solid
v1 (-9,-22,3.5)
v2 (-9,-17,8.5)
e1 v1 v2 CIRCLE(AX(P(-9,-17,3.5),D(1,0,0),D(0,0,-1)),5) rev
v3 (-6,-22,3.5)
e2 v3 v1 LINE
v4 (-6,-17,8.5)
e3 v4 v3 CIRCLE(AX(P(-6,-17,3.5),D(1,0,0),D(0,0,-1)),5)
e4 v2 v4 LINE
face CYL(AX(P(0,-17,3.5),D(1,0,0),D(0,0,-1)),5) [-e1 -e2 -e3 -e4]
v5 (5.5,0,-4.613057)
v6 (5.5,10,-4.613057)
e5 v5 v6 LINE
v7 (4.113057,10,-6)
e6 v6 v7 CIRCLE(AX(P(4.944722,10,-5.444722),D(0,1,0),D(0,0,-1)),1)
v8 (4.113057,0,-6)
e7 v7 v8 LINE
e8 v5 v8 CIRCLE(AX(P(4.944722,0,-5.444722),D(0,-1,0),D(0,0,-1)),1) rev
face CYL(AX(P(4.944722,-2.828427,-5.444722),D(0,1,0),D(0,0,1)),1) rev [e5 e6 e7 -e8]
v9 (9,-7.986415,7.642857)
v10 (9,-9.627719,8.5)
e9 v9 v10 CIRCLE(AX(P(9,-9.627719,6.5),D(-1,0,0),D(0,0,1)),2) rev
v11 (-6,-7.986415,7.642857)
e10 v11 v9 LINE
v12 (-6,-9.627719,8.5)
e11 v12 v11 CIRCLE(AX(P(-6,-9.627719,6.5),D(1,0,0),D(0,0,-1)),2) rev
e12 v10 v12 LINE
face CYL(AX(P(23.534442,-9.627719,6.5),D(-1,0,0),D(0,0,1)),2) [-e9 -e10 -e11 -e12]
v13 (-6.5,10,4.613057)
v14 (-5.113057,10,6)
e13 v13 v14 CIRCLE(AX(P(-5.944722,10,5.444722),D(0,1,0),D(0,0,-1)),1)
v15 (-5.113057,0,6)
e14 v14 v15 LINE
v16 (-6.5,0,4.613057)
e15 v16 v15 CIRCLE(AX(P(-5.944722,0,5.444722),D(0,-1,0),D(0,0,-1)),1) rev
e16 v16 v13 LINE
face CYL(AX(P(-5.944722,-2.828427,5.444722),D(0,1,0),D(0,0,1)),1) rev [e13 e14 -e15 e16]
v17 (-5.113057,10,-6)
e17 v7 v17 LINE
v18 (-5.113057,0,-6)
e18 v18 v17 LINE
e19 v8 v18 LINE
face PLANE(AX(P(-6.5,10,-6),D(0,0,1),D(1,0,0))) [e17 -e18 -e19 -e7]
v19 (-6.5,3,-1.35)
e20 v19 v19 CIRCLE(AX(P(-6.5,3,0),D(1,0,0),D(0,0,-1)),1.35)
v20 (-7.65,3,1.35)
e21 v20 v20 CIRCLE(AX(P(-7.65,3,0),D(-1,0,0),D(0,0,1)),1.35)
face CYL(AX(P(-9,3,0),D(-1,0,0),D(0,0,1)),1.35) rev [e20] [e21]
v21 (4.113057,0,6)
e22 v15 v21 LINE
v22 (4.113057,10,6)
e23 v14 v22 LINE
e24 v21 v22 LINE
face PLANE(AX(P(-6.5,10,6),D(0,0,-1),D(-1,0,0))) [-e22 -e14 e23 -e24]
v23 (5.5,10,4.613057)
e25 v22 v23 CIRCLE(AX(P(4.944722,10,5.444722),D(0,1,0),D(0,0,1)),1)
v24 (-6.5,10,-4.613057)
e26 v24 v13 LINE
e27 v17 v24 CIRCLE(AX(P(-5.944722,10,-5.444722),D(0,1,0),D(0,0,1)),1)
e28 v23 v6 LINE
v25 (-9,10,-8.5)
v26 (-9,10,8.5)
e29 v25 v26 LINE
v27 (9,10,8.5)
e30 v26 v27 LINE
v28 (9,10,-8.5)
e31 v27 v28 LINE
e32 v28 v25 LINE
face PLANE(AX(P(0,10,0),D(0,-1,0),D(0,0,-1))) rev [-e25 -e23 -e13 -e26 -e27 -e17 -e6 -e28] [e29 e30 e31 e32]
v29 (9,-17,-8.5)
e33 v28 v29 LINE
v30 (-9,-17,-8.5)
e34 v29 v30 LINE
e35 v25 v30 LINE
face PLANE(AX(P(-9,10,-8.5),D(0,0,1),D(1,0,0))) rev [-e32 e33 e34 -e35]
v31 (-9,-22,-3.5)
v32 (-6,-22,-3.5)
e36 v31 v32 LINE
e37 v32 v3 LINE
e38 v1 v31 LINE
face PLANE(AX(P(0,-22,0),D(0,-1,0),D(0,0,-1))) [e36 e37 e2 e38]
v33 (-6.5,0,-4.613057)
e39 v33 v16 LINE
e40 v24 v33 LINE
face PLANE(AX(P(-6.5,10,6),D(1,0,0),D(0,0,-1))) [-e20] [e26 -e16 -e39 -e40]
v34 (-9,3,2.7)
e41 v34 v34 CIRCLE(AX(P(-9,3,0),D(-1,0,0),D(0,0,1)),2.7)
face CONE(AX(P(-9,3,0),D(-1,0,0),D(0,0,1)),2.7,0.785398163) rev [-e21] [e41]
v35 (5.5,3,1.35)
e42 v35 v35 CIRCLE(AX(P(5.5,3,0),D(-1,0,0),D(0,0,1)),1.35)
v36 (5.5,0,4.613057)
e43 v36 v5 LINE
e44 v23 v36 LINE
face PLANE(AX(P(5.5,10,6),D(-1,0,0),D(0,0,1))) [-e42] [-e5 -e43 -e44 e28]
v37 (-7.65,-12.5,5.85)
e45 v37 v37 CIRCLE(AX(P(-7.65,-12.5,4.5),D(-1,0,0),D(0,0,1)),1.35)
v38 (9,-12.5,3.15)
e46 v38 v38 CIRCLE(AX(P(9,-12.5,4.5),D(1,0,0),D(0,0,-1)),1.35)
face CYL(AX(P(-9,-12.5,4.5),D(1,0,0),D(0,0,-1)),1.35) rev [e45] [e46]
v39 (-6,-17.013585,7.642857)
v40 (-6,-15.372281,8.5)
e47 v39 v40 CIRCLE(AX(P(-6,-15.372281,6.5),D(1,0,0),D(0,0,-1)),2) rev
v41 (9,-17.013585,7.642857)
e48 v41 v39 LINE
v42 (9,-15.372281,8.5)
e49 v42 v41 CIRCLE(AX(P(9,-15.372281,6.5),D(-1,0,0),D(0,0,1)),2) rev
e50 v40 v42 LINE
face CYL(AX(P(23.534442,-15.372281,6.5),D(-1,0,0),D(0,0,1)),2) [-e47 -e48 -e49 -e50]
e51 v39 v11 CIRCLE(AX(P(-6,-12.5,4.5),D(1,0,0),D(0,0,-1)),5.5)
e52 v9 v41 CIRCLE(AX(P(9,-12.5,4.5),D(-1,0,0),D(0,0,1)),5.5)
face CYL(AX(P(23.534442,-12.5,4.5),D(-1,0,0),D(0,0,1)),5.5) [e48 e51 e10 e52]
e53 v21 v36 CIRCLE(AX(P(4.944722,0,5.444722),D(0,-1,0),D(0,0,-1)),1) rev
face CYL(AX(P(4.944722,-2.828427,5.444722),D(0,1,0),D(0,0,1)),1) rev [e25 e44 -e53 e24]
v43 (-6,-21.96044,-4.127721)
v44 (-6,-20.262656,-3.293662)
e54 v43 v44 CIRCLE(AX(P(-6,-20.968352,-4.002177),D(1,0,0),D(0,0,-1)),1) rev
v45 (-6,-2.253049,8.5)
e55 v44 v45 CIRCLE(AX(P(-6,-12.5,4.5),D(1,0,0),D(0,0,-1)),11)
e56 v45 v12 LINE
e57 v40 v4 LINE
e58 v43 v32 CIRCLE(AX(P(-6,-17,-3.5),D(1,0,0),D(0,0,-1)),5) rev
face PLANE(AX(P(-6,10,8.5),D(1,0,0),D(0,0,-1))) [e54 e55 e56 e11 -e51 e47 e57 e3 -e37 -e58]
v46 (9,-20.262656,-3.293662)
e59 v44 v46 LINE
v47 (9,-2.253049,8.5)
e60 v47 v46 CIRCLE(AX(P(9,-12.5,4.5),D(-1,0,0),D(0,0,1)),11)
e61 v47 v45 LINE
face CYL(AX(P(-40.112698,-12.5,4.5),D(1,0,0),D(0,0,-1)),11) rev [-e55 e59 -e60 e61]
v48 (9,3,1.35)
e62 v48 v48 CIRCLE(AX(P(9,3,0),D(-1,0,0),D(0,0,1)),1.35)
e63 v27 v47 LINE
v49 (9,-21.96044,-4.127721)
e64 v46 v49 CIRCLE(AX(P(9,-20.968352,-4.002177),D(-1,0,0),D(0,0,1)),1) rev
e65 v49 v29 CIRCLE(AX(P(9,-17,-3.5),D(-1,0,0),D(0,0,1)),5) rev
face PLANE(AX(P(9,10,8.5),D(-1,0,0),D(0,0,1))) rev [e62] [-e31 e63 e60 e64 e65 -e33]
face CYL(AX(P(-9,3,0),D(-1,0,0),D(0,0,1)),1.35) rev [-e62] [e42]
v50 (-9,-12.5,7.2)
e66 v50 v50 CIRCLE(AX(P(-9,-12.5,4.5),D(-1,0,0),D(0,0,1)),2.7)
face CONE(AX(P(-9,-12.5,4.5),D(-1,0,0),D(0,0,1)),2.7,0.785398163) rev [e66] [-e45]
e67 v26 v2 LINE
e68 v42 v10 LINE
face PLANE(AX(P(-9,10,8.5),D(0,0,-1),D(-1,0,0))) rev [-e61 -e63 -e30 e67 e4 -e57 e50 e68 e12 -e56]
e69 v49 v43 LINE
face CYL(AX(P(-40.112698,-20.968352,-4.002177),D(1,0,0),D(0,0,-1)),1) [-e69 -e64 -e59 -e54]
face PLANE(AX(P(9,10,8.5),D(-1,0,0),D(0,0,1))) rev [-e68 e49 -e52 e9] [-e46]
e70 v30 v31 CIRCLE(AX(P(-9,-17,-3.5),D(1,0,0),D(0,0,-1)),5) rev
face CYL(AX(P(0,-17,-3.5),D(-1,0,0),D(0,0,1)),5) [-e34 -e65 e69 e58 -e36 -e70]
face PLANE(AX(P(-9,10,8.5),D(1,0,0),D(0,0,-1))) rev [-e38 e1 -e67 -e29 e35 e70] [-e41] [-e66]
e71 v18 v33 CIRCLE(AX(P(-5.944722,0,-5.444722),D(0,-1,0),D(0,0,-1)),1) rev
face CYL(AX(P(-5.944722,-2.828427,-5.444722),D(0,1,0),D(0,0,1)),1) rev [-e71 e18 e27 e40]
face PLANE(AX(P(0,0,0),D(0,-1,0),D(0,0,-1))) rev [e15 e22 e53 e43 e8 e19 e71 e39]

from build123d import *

# Parameters (mm, degrees)
SKETCH_1_W                = 18
SKETCH_1_H                = 17
SKETCH_1_W_2              = 12
SKETCH_1_H_2              = 12
EXTRUDE_1_DEPTH           = 10
SKETCH_4_W                = 18
SKETCH_4_H                = 17
EXTRUDE_2_DEPTH           = 22
SKETCH_5_R                = 11
CUT_EXTRUDE_1_DEPTH       = 15
SKETCH_8_R                = 1.25
EXTRUDE_3_DEPTH           = 15
SKETCH_13_R               = 1.25
CUT_EXTRUDE_5_DEPTH       = 30.669007398
SKETCH_9_R                = 1.35
CUT_EXTRUDE_3_DEPTH       = 30.669007398
FILLET_4_R                = 5
SKETCH_20_R               = 1
CUT_EXTRUDE_7_DEPTH       = 10
FILLET_5_R                = 5
FILLET_6_R                = 2
FILLET_7_R                = 1
HOLE_WIZARD_1_D           = 2.7
HOLE_WIZARD_1_CSINK_D     = 5.4
HOLE_WIZARD_1_CSINK_ANGLE = 90


with BuildPart() as part:
    # 草图1 → 凸台-拉伸1 (new body)
    with BuildSketch(Plane(origin=(0, 0, 0), x_dir=(1, 0, 0), z_dir=(0, 1, 0))):
        Rectangle(SKETCH_1_W, SKETCH_1_H)
        with Locations((-0.5, 0)):
            Rectangle(SKETCH_1_W_2, SKETCH_1_H_2, mode=Mode.SUBTRACT)
    extrude(amount=EXTRUDE_1_DEPTH)

    # 草图4 → 凸台-拉伸2 (add)
    with BuildSketch(Plane.XZ):
        Rectangle(SKETCH_4_W, SKETCH_4_H)
    extrude(amount=EXTRUDE_2_DEPTH)

    # 草图5 → 切除-拉伸1 (cut)
    with BuildSketch(Plane.ZY.offset(-9)):
        with Locations((4.5, -12.5)):
            Circle(SKETCH_5_R)
    extrude(amount=CUT_EXTRUDE_1_DEPTH, mode=Mode.SUBTRACT)

    # 草图8 → 凸台-拉伸3 (add)
    with BuildSketch(Plane(origin=(-6, 0, 0), x_dir=(0, 0, -1), z_dir=(1, 0, 0))):
        with BuildLine():
            Line((-8.5, -8.725082782), (-8.5, -16.274917218))
            ThreePointArc((-8.5, -16.274917218), (1, -12.5), (-8.5, -8.725082782))
        make_face()
        with Locations(Location((-4.5, -12.5, 0), (0, 0, 180))):
            Circle(SKETCH_8_R, mode=Mode.SUBTRACT)
    extrude(amount=EXTRUDE_3_DEPTH)

    # 草图13 → 切除-拉伸5 (cut, through all)
    with BuildSketch(Plane(origin=(9, 0, 0), x_dir=(0, 0, -1), z_dir=(1, 0, 0))):
        with Locations((0, 3)):
            Circle(SKETCH_13_R)
    extrude(amount=-CUT_EXTRUDE_5_DEPTH, mode=Mode.SUBTRACT)

    # 草图9 → 切除-拉伸3 (cut, through all)
    with BuildSketch(Plane(origin=(9, 0, 0), x_dir=(0, 0, -1), z_dir=(1, 0, 0))):
        with Locations((-4.5, -12.5)):
            Circle(SKETCH_9_R)
    extrude(amount=-CUT_EXTRUDE_3_DEPTH, mode=Mode.SUBTRACT)

    # 圆角4
    fillet_4_edges = [part.edges().sort_by_distance(p)[0] for p in [
        (0, -22, -8.5),
    ]]
    fillet(fillet_4_edges, radius=FILLET_4_R)

    # 草图20 → 切除-拉伸7 (cut)
    with BuildSketch(Plane(origin=(0, 10, 0), x_dir=(1, 0, 0), z_dir=(0, 1, 0))):
        with Locations((4.944722215, -5.444722215)):
            Circle(SKETCH_20_R)
        with Locations((4.944722215, 5.444722215)):
            Circle(SKETCH_20_R)
        with Locations((-5.944722215, 5.444722215)):
            Circle(SKETCH_20_R)
        with Locations((-5.944722215, -5.444722215)):
            Circle(SKETCH_20_R)
    extrude(amount=-CUT_EXTRUDE_7_DEPTH, mode=Mode.SUBTRACT)

    # 圆角5
    fillet_5_edges = [part.edges().sort_by_distance(p)[0] for p in [
        (-7.5, -22, 8.5),
    ]]
    fillet(fillet_5_edges, radius=FILLET_5_R)

    # 圆角6
    fillet_6_edges = [part.edges().sort_by_distance(p)[0] for p in [
        (1.5, -16.274917218, 8.5),
        (1.5, -8.725082782, 8.5),
    ]]
    fillet(fillet_6_edges, radius=FILLET_6_R)

    # 圆角7
    # the kernel refuses this fillet: 1 mm, written as the material it takes off along each edge
    with BuildSketch(Plane(origin=(-6, -22, -1.045268253), x_dir=(0, 0.6114361728106764, -0.7912937549220469), z_dir=(1, 0, 0))) as fillet_7_piece_1:
        with BuildLine():
            CenterArc((2.970570235, -0.991624388), FILLET_7_R, 97.420778889, 142.097986779)
            Line((2.463314102, -1.853419733), (2.412588489, -1.939599267))
            ThreePointArc((2.412588489, -1.939599267), (1.881270284, -1.58004116), (-0.061143617, -0.079129375))
            Line((-0.061143617, -0.079129375), (0.012915523, 0.099162439))
            ThreePointArc((0.012915523, 0.099162439), (1.420707504, 0.00786827), (2.828499484, 0.099162439))
            Line((2.828499484, 0.099162439), (2.841415007, 0))
        make_face()
    extrude(amount=22.706766942, mode=Mode.SUBTRACT)

    # 打孔尺寸(%根据十字)槽沉头木螺钉的类型1 (through all)
    with Locations(Plane.ZY.offset(9)):
        with Locations((4.5, -12.5), (0, 3)):
            CounterSinkHole(HOLE_WIZARD_1_D / 2, HOLE_WIZARD_1_CSINK_D / 2, counter_sink_angle=HOLE_WIZARD_1_CSINK_ANGLE)


solid = part.part
